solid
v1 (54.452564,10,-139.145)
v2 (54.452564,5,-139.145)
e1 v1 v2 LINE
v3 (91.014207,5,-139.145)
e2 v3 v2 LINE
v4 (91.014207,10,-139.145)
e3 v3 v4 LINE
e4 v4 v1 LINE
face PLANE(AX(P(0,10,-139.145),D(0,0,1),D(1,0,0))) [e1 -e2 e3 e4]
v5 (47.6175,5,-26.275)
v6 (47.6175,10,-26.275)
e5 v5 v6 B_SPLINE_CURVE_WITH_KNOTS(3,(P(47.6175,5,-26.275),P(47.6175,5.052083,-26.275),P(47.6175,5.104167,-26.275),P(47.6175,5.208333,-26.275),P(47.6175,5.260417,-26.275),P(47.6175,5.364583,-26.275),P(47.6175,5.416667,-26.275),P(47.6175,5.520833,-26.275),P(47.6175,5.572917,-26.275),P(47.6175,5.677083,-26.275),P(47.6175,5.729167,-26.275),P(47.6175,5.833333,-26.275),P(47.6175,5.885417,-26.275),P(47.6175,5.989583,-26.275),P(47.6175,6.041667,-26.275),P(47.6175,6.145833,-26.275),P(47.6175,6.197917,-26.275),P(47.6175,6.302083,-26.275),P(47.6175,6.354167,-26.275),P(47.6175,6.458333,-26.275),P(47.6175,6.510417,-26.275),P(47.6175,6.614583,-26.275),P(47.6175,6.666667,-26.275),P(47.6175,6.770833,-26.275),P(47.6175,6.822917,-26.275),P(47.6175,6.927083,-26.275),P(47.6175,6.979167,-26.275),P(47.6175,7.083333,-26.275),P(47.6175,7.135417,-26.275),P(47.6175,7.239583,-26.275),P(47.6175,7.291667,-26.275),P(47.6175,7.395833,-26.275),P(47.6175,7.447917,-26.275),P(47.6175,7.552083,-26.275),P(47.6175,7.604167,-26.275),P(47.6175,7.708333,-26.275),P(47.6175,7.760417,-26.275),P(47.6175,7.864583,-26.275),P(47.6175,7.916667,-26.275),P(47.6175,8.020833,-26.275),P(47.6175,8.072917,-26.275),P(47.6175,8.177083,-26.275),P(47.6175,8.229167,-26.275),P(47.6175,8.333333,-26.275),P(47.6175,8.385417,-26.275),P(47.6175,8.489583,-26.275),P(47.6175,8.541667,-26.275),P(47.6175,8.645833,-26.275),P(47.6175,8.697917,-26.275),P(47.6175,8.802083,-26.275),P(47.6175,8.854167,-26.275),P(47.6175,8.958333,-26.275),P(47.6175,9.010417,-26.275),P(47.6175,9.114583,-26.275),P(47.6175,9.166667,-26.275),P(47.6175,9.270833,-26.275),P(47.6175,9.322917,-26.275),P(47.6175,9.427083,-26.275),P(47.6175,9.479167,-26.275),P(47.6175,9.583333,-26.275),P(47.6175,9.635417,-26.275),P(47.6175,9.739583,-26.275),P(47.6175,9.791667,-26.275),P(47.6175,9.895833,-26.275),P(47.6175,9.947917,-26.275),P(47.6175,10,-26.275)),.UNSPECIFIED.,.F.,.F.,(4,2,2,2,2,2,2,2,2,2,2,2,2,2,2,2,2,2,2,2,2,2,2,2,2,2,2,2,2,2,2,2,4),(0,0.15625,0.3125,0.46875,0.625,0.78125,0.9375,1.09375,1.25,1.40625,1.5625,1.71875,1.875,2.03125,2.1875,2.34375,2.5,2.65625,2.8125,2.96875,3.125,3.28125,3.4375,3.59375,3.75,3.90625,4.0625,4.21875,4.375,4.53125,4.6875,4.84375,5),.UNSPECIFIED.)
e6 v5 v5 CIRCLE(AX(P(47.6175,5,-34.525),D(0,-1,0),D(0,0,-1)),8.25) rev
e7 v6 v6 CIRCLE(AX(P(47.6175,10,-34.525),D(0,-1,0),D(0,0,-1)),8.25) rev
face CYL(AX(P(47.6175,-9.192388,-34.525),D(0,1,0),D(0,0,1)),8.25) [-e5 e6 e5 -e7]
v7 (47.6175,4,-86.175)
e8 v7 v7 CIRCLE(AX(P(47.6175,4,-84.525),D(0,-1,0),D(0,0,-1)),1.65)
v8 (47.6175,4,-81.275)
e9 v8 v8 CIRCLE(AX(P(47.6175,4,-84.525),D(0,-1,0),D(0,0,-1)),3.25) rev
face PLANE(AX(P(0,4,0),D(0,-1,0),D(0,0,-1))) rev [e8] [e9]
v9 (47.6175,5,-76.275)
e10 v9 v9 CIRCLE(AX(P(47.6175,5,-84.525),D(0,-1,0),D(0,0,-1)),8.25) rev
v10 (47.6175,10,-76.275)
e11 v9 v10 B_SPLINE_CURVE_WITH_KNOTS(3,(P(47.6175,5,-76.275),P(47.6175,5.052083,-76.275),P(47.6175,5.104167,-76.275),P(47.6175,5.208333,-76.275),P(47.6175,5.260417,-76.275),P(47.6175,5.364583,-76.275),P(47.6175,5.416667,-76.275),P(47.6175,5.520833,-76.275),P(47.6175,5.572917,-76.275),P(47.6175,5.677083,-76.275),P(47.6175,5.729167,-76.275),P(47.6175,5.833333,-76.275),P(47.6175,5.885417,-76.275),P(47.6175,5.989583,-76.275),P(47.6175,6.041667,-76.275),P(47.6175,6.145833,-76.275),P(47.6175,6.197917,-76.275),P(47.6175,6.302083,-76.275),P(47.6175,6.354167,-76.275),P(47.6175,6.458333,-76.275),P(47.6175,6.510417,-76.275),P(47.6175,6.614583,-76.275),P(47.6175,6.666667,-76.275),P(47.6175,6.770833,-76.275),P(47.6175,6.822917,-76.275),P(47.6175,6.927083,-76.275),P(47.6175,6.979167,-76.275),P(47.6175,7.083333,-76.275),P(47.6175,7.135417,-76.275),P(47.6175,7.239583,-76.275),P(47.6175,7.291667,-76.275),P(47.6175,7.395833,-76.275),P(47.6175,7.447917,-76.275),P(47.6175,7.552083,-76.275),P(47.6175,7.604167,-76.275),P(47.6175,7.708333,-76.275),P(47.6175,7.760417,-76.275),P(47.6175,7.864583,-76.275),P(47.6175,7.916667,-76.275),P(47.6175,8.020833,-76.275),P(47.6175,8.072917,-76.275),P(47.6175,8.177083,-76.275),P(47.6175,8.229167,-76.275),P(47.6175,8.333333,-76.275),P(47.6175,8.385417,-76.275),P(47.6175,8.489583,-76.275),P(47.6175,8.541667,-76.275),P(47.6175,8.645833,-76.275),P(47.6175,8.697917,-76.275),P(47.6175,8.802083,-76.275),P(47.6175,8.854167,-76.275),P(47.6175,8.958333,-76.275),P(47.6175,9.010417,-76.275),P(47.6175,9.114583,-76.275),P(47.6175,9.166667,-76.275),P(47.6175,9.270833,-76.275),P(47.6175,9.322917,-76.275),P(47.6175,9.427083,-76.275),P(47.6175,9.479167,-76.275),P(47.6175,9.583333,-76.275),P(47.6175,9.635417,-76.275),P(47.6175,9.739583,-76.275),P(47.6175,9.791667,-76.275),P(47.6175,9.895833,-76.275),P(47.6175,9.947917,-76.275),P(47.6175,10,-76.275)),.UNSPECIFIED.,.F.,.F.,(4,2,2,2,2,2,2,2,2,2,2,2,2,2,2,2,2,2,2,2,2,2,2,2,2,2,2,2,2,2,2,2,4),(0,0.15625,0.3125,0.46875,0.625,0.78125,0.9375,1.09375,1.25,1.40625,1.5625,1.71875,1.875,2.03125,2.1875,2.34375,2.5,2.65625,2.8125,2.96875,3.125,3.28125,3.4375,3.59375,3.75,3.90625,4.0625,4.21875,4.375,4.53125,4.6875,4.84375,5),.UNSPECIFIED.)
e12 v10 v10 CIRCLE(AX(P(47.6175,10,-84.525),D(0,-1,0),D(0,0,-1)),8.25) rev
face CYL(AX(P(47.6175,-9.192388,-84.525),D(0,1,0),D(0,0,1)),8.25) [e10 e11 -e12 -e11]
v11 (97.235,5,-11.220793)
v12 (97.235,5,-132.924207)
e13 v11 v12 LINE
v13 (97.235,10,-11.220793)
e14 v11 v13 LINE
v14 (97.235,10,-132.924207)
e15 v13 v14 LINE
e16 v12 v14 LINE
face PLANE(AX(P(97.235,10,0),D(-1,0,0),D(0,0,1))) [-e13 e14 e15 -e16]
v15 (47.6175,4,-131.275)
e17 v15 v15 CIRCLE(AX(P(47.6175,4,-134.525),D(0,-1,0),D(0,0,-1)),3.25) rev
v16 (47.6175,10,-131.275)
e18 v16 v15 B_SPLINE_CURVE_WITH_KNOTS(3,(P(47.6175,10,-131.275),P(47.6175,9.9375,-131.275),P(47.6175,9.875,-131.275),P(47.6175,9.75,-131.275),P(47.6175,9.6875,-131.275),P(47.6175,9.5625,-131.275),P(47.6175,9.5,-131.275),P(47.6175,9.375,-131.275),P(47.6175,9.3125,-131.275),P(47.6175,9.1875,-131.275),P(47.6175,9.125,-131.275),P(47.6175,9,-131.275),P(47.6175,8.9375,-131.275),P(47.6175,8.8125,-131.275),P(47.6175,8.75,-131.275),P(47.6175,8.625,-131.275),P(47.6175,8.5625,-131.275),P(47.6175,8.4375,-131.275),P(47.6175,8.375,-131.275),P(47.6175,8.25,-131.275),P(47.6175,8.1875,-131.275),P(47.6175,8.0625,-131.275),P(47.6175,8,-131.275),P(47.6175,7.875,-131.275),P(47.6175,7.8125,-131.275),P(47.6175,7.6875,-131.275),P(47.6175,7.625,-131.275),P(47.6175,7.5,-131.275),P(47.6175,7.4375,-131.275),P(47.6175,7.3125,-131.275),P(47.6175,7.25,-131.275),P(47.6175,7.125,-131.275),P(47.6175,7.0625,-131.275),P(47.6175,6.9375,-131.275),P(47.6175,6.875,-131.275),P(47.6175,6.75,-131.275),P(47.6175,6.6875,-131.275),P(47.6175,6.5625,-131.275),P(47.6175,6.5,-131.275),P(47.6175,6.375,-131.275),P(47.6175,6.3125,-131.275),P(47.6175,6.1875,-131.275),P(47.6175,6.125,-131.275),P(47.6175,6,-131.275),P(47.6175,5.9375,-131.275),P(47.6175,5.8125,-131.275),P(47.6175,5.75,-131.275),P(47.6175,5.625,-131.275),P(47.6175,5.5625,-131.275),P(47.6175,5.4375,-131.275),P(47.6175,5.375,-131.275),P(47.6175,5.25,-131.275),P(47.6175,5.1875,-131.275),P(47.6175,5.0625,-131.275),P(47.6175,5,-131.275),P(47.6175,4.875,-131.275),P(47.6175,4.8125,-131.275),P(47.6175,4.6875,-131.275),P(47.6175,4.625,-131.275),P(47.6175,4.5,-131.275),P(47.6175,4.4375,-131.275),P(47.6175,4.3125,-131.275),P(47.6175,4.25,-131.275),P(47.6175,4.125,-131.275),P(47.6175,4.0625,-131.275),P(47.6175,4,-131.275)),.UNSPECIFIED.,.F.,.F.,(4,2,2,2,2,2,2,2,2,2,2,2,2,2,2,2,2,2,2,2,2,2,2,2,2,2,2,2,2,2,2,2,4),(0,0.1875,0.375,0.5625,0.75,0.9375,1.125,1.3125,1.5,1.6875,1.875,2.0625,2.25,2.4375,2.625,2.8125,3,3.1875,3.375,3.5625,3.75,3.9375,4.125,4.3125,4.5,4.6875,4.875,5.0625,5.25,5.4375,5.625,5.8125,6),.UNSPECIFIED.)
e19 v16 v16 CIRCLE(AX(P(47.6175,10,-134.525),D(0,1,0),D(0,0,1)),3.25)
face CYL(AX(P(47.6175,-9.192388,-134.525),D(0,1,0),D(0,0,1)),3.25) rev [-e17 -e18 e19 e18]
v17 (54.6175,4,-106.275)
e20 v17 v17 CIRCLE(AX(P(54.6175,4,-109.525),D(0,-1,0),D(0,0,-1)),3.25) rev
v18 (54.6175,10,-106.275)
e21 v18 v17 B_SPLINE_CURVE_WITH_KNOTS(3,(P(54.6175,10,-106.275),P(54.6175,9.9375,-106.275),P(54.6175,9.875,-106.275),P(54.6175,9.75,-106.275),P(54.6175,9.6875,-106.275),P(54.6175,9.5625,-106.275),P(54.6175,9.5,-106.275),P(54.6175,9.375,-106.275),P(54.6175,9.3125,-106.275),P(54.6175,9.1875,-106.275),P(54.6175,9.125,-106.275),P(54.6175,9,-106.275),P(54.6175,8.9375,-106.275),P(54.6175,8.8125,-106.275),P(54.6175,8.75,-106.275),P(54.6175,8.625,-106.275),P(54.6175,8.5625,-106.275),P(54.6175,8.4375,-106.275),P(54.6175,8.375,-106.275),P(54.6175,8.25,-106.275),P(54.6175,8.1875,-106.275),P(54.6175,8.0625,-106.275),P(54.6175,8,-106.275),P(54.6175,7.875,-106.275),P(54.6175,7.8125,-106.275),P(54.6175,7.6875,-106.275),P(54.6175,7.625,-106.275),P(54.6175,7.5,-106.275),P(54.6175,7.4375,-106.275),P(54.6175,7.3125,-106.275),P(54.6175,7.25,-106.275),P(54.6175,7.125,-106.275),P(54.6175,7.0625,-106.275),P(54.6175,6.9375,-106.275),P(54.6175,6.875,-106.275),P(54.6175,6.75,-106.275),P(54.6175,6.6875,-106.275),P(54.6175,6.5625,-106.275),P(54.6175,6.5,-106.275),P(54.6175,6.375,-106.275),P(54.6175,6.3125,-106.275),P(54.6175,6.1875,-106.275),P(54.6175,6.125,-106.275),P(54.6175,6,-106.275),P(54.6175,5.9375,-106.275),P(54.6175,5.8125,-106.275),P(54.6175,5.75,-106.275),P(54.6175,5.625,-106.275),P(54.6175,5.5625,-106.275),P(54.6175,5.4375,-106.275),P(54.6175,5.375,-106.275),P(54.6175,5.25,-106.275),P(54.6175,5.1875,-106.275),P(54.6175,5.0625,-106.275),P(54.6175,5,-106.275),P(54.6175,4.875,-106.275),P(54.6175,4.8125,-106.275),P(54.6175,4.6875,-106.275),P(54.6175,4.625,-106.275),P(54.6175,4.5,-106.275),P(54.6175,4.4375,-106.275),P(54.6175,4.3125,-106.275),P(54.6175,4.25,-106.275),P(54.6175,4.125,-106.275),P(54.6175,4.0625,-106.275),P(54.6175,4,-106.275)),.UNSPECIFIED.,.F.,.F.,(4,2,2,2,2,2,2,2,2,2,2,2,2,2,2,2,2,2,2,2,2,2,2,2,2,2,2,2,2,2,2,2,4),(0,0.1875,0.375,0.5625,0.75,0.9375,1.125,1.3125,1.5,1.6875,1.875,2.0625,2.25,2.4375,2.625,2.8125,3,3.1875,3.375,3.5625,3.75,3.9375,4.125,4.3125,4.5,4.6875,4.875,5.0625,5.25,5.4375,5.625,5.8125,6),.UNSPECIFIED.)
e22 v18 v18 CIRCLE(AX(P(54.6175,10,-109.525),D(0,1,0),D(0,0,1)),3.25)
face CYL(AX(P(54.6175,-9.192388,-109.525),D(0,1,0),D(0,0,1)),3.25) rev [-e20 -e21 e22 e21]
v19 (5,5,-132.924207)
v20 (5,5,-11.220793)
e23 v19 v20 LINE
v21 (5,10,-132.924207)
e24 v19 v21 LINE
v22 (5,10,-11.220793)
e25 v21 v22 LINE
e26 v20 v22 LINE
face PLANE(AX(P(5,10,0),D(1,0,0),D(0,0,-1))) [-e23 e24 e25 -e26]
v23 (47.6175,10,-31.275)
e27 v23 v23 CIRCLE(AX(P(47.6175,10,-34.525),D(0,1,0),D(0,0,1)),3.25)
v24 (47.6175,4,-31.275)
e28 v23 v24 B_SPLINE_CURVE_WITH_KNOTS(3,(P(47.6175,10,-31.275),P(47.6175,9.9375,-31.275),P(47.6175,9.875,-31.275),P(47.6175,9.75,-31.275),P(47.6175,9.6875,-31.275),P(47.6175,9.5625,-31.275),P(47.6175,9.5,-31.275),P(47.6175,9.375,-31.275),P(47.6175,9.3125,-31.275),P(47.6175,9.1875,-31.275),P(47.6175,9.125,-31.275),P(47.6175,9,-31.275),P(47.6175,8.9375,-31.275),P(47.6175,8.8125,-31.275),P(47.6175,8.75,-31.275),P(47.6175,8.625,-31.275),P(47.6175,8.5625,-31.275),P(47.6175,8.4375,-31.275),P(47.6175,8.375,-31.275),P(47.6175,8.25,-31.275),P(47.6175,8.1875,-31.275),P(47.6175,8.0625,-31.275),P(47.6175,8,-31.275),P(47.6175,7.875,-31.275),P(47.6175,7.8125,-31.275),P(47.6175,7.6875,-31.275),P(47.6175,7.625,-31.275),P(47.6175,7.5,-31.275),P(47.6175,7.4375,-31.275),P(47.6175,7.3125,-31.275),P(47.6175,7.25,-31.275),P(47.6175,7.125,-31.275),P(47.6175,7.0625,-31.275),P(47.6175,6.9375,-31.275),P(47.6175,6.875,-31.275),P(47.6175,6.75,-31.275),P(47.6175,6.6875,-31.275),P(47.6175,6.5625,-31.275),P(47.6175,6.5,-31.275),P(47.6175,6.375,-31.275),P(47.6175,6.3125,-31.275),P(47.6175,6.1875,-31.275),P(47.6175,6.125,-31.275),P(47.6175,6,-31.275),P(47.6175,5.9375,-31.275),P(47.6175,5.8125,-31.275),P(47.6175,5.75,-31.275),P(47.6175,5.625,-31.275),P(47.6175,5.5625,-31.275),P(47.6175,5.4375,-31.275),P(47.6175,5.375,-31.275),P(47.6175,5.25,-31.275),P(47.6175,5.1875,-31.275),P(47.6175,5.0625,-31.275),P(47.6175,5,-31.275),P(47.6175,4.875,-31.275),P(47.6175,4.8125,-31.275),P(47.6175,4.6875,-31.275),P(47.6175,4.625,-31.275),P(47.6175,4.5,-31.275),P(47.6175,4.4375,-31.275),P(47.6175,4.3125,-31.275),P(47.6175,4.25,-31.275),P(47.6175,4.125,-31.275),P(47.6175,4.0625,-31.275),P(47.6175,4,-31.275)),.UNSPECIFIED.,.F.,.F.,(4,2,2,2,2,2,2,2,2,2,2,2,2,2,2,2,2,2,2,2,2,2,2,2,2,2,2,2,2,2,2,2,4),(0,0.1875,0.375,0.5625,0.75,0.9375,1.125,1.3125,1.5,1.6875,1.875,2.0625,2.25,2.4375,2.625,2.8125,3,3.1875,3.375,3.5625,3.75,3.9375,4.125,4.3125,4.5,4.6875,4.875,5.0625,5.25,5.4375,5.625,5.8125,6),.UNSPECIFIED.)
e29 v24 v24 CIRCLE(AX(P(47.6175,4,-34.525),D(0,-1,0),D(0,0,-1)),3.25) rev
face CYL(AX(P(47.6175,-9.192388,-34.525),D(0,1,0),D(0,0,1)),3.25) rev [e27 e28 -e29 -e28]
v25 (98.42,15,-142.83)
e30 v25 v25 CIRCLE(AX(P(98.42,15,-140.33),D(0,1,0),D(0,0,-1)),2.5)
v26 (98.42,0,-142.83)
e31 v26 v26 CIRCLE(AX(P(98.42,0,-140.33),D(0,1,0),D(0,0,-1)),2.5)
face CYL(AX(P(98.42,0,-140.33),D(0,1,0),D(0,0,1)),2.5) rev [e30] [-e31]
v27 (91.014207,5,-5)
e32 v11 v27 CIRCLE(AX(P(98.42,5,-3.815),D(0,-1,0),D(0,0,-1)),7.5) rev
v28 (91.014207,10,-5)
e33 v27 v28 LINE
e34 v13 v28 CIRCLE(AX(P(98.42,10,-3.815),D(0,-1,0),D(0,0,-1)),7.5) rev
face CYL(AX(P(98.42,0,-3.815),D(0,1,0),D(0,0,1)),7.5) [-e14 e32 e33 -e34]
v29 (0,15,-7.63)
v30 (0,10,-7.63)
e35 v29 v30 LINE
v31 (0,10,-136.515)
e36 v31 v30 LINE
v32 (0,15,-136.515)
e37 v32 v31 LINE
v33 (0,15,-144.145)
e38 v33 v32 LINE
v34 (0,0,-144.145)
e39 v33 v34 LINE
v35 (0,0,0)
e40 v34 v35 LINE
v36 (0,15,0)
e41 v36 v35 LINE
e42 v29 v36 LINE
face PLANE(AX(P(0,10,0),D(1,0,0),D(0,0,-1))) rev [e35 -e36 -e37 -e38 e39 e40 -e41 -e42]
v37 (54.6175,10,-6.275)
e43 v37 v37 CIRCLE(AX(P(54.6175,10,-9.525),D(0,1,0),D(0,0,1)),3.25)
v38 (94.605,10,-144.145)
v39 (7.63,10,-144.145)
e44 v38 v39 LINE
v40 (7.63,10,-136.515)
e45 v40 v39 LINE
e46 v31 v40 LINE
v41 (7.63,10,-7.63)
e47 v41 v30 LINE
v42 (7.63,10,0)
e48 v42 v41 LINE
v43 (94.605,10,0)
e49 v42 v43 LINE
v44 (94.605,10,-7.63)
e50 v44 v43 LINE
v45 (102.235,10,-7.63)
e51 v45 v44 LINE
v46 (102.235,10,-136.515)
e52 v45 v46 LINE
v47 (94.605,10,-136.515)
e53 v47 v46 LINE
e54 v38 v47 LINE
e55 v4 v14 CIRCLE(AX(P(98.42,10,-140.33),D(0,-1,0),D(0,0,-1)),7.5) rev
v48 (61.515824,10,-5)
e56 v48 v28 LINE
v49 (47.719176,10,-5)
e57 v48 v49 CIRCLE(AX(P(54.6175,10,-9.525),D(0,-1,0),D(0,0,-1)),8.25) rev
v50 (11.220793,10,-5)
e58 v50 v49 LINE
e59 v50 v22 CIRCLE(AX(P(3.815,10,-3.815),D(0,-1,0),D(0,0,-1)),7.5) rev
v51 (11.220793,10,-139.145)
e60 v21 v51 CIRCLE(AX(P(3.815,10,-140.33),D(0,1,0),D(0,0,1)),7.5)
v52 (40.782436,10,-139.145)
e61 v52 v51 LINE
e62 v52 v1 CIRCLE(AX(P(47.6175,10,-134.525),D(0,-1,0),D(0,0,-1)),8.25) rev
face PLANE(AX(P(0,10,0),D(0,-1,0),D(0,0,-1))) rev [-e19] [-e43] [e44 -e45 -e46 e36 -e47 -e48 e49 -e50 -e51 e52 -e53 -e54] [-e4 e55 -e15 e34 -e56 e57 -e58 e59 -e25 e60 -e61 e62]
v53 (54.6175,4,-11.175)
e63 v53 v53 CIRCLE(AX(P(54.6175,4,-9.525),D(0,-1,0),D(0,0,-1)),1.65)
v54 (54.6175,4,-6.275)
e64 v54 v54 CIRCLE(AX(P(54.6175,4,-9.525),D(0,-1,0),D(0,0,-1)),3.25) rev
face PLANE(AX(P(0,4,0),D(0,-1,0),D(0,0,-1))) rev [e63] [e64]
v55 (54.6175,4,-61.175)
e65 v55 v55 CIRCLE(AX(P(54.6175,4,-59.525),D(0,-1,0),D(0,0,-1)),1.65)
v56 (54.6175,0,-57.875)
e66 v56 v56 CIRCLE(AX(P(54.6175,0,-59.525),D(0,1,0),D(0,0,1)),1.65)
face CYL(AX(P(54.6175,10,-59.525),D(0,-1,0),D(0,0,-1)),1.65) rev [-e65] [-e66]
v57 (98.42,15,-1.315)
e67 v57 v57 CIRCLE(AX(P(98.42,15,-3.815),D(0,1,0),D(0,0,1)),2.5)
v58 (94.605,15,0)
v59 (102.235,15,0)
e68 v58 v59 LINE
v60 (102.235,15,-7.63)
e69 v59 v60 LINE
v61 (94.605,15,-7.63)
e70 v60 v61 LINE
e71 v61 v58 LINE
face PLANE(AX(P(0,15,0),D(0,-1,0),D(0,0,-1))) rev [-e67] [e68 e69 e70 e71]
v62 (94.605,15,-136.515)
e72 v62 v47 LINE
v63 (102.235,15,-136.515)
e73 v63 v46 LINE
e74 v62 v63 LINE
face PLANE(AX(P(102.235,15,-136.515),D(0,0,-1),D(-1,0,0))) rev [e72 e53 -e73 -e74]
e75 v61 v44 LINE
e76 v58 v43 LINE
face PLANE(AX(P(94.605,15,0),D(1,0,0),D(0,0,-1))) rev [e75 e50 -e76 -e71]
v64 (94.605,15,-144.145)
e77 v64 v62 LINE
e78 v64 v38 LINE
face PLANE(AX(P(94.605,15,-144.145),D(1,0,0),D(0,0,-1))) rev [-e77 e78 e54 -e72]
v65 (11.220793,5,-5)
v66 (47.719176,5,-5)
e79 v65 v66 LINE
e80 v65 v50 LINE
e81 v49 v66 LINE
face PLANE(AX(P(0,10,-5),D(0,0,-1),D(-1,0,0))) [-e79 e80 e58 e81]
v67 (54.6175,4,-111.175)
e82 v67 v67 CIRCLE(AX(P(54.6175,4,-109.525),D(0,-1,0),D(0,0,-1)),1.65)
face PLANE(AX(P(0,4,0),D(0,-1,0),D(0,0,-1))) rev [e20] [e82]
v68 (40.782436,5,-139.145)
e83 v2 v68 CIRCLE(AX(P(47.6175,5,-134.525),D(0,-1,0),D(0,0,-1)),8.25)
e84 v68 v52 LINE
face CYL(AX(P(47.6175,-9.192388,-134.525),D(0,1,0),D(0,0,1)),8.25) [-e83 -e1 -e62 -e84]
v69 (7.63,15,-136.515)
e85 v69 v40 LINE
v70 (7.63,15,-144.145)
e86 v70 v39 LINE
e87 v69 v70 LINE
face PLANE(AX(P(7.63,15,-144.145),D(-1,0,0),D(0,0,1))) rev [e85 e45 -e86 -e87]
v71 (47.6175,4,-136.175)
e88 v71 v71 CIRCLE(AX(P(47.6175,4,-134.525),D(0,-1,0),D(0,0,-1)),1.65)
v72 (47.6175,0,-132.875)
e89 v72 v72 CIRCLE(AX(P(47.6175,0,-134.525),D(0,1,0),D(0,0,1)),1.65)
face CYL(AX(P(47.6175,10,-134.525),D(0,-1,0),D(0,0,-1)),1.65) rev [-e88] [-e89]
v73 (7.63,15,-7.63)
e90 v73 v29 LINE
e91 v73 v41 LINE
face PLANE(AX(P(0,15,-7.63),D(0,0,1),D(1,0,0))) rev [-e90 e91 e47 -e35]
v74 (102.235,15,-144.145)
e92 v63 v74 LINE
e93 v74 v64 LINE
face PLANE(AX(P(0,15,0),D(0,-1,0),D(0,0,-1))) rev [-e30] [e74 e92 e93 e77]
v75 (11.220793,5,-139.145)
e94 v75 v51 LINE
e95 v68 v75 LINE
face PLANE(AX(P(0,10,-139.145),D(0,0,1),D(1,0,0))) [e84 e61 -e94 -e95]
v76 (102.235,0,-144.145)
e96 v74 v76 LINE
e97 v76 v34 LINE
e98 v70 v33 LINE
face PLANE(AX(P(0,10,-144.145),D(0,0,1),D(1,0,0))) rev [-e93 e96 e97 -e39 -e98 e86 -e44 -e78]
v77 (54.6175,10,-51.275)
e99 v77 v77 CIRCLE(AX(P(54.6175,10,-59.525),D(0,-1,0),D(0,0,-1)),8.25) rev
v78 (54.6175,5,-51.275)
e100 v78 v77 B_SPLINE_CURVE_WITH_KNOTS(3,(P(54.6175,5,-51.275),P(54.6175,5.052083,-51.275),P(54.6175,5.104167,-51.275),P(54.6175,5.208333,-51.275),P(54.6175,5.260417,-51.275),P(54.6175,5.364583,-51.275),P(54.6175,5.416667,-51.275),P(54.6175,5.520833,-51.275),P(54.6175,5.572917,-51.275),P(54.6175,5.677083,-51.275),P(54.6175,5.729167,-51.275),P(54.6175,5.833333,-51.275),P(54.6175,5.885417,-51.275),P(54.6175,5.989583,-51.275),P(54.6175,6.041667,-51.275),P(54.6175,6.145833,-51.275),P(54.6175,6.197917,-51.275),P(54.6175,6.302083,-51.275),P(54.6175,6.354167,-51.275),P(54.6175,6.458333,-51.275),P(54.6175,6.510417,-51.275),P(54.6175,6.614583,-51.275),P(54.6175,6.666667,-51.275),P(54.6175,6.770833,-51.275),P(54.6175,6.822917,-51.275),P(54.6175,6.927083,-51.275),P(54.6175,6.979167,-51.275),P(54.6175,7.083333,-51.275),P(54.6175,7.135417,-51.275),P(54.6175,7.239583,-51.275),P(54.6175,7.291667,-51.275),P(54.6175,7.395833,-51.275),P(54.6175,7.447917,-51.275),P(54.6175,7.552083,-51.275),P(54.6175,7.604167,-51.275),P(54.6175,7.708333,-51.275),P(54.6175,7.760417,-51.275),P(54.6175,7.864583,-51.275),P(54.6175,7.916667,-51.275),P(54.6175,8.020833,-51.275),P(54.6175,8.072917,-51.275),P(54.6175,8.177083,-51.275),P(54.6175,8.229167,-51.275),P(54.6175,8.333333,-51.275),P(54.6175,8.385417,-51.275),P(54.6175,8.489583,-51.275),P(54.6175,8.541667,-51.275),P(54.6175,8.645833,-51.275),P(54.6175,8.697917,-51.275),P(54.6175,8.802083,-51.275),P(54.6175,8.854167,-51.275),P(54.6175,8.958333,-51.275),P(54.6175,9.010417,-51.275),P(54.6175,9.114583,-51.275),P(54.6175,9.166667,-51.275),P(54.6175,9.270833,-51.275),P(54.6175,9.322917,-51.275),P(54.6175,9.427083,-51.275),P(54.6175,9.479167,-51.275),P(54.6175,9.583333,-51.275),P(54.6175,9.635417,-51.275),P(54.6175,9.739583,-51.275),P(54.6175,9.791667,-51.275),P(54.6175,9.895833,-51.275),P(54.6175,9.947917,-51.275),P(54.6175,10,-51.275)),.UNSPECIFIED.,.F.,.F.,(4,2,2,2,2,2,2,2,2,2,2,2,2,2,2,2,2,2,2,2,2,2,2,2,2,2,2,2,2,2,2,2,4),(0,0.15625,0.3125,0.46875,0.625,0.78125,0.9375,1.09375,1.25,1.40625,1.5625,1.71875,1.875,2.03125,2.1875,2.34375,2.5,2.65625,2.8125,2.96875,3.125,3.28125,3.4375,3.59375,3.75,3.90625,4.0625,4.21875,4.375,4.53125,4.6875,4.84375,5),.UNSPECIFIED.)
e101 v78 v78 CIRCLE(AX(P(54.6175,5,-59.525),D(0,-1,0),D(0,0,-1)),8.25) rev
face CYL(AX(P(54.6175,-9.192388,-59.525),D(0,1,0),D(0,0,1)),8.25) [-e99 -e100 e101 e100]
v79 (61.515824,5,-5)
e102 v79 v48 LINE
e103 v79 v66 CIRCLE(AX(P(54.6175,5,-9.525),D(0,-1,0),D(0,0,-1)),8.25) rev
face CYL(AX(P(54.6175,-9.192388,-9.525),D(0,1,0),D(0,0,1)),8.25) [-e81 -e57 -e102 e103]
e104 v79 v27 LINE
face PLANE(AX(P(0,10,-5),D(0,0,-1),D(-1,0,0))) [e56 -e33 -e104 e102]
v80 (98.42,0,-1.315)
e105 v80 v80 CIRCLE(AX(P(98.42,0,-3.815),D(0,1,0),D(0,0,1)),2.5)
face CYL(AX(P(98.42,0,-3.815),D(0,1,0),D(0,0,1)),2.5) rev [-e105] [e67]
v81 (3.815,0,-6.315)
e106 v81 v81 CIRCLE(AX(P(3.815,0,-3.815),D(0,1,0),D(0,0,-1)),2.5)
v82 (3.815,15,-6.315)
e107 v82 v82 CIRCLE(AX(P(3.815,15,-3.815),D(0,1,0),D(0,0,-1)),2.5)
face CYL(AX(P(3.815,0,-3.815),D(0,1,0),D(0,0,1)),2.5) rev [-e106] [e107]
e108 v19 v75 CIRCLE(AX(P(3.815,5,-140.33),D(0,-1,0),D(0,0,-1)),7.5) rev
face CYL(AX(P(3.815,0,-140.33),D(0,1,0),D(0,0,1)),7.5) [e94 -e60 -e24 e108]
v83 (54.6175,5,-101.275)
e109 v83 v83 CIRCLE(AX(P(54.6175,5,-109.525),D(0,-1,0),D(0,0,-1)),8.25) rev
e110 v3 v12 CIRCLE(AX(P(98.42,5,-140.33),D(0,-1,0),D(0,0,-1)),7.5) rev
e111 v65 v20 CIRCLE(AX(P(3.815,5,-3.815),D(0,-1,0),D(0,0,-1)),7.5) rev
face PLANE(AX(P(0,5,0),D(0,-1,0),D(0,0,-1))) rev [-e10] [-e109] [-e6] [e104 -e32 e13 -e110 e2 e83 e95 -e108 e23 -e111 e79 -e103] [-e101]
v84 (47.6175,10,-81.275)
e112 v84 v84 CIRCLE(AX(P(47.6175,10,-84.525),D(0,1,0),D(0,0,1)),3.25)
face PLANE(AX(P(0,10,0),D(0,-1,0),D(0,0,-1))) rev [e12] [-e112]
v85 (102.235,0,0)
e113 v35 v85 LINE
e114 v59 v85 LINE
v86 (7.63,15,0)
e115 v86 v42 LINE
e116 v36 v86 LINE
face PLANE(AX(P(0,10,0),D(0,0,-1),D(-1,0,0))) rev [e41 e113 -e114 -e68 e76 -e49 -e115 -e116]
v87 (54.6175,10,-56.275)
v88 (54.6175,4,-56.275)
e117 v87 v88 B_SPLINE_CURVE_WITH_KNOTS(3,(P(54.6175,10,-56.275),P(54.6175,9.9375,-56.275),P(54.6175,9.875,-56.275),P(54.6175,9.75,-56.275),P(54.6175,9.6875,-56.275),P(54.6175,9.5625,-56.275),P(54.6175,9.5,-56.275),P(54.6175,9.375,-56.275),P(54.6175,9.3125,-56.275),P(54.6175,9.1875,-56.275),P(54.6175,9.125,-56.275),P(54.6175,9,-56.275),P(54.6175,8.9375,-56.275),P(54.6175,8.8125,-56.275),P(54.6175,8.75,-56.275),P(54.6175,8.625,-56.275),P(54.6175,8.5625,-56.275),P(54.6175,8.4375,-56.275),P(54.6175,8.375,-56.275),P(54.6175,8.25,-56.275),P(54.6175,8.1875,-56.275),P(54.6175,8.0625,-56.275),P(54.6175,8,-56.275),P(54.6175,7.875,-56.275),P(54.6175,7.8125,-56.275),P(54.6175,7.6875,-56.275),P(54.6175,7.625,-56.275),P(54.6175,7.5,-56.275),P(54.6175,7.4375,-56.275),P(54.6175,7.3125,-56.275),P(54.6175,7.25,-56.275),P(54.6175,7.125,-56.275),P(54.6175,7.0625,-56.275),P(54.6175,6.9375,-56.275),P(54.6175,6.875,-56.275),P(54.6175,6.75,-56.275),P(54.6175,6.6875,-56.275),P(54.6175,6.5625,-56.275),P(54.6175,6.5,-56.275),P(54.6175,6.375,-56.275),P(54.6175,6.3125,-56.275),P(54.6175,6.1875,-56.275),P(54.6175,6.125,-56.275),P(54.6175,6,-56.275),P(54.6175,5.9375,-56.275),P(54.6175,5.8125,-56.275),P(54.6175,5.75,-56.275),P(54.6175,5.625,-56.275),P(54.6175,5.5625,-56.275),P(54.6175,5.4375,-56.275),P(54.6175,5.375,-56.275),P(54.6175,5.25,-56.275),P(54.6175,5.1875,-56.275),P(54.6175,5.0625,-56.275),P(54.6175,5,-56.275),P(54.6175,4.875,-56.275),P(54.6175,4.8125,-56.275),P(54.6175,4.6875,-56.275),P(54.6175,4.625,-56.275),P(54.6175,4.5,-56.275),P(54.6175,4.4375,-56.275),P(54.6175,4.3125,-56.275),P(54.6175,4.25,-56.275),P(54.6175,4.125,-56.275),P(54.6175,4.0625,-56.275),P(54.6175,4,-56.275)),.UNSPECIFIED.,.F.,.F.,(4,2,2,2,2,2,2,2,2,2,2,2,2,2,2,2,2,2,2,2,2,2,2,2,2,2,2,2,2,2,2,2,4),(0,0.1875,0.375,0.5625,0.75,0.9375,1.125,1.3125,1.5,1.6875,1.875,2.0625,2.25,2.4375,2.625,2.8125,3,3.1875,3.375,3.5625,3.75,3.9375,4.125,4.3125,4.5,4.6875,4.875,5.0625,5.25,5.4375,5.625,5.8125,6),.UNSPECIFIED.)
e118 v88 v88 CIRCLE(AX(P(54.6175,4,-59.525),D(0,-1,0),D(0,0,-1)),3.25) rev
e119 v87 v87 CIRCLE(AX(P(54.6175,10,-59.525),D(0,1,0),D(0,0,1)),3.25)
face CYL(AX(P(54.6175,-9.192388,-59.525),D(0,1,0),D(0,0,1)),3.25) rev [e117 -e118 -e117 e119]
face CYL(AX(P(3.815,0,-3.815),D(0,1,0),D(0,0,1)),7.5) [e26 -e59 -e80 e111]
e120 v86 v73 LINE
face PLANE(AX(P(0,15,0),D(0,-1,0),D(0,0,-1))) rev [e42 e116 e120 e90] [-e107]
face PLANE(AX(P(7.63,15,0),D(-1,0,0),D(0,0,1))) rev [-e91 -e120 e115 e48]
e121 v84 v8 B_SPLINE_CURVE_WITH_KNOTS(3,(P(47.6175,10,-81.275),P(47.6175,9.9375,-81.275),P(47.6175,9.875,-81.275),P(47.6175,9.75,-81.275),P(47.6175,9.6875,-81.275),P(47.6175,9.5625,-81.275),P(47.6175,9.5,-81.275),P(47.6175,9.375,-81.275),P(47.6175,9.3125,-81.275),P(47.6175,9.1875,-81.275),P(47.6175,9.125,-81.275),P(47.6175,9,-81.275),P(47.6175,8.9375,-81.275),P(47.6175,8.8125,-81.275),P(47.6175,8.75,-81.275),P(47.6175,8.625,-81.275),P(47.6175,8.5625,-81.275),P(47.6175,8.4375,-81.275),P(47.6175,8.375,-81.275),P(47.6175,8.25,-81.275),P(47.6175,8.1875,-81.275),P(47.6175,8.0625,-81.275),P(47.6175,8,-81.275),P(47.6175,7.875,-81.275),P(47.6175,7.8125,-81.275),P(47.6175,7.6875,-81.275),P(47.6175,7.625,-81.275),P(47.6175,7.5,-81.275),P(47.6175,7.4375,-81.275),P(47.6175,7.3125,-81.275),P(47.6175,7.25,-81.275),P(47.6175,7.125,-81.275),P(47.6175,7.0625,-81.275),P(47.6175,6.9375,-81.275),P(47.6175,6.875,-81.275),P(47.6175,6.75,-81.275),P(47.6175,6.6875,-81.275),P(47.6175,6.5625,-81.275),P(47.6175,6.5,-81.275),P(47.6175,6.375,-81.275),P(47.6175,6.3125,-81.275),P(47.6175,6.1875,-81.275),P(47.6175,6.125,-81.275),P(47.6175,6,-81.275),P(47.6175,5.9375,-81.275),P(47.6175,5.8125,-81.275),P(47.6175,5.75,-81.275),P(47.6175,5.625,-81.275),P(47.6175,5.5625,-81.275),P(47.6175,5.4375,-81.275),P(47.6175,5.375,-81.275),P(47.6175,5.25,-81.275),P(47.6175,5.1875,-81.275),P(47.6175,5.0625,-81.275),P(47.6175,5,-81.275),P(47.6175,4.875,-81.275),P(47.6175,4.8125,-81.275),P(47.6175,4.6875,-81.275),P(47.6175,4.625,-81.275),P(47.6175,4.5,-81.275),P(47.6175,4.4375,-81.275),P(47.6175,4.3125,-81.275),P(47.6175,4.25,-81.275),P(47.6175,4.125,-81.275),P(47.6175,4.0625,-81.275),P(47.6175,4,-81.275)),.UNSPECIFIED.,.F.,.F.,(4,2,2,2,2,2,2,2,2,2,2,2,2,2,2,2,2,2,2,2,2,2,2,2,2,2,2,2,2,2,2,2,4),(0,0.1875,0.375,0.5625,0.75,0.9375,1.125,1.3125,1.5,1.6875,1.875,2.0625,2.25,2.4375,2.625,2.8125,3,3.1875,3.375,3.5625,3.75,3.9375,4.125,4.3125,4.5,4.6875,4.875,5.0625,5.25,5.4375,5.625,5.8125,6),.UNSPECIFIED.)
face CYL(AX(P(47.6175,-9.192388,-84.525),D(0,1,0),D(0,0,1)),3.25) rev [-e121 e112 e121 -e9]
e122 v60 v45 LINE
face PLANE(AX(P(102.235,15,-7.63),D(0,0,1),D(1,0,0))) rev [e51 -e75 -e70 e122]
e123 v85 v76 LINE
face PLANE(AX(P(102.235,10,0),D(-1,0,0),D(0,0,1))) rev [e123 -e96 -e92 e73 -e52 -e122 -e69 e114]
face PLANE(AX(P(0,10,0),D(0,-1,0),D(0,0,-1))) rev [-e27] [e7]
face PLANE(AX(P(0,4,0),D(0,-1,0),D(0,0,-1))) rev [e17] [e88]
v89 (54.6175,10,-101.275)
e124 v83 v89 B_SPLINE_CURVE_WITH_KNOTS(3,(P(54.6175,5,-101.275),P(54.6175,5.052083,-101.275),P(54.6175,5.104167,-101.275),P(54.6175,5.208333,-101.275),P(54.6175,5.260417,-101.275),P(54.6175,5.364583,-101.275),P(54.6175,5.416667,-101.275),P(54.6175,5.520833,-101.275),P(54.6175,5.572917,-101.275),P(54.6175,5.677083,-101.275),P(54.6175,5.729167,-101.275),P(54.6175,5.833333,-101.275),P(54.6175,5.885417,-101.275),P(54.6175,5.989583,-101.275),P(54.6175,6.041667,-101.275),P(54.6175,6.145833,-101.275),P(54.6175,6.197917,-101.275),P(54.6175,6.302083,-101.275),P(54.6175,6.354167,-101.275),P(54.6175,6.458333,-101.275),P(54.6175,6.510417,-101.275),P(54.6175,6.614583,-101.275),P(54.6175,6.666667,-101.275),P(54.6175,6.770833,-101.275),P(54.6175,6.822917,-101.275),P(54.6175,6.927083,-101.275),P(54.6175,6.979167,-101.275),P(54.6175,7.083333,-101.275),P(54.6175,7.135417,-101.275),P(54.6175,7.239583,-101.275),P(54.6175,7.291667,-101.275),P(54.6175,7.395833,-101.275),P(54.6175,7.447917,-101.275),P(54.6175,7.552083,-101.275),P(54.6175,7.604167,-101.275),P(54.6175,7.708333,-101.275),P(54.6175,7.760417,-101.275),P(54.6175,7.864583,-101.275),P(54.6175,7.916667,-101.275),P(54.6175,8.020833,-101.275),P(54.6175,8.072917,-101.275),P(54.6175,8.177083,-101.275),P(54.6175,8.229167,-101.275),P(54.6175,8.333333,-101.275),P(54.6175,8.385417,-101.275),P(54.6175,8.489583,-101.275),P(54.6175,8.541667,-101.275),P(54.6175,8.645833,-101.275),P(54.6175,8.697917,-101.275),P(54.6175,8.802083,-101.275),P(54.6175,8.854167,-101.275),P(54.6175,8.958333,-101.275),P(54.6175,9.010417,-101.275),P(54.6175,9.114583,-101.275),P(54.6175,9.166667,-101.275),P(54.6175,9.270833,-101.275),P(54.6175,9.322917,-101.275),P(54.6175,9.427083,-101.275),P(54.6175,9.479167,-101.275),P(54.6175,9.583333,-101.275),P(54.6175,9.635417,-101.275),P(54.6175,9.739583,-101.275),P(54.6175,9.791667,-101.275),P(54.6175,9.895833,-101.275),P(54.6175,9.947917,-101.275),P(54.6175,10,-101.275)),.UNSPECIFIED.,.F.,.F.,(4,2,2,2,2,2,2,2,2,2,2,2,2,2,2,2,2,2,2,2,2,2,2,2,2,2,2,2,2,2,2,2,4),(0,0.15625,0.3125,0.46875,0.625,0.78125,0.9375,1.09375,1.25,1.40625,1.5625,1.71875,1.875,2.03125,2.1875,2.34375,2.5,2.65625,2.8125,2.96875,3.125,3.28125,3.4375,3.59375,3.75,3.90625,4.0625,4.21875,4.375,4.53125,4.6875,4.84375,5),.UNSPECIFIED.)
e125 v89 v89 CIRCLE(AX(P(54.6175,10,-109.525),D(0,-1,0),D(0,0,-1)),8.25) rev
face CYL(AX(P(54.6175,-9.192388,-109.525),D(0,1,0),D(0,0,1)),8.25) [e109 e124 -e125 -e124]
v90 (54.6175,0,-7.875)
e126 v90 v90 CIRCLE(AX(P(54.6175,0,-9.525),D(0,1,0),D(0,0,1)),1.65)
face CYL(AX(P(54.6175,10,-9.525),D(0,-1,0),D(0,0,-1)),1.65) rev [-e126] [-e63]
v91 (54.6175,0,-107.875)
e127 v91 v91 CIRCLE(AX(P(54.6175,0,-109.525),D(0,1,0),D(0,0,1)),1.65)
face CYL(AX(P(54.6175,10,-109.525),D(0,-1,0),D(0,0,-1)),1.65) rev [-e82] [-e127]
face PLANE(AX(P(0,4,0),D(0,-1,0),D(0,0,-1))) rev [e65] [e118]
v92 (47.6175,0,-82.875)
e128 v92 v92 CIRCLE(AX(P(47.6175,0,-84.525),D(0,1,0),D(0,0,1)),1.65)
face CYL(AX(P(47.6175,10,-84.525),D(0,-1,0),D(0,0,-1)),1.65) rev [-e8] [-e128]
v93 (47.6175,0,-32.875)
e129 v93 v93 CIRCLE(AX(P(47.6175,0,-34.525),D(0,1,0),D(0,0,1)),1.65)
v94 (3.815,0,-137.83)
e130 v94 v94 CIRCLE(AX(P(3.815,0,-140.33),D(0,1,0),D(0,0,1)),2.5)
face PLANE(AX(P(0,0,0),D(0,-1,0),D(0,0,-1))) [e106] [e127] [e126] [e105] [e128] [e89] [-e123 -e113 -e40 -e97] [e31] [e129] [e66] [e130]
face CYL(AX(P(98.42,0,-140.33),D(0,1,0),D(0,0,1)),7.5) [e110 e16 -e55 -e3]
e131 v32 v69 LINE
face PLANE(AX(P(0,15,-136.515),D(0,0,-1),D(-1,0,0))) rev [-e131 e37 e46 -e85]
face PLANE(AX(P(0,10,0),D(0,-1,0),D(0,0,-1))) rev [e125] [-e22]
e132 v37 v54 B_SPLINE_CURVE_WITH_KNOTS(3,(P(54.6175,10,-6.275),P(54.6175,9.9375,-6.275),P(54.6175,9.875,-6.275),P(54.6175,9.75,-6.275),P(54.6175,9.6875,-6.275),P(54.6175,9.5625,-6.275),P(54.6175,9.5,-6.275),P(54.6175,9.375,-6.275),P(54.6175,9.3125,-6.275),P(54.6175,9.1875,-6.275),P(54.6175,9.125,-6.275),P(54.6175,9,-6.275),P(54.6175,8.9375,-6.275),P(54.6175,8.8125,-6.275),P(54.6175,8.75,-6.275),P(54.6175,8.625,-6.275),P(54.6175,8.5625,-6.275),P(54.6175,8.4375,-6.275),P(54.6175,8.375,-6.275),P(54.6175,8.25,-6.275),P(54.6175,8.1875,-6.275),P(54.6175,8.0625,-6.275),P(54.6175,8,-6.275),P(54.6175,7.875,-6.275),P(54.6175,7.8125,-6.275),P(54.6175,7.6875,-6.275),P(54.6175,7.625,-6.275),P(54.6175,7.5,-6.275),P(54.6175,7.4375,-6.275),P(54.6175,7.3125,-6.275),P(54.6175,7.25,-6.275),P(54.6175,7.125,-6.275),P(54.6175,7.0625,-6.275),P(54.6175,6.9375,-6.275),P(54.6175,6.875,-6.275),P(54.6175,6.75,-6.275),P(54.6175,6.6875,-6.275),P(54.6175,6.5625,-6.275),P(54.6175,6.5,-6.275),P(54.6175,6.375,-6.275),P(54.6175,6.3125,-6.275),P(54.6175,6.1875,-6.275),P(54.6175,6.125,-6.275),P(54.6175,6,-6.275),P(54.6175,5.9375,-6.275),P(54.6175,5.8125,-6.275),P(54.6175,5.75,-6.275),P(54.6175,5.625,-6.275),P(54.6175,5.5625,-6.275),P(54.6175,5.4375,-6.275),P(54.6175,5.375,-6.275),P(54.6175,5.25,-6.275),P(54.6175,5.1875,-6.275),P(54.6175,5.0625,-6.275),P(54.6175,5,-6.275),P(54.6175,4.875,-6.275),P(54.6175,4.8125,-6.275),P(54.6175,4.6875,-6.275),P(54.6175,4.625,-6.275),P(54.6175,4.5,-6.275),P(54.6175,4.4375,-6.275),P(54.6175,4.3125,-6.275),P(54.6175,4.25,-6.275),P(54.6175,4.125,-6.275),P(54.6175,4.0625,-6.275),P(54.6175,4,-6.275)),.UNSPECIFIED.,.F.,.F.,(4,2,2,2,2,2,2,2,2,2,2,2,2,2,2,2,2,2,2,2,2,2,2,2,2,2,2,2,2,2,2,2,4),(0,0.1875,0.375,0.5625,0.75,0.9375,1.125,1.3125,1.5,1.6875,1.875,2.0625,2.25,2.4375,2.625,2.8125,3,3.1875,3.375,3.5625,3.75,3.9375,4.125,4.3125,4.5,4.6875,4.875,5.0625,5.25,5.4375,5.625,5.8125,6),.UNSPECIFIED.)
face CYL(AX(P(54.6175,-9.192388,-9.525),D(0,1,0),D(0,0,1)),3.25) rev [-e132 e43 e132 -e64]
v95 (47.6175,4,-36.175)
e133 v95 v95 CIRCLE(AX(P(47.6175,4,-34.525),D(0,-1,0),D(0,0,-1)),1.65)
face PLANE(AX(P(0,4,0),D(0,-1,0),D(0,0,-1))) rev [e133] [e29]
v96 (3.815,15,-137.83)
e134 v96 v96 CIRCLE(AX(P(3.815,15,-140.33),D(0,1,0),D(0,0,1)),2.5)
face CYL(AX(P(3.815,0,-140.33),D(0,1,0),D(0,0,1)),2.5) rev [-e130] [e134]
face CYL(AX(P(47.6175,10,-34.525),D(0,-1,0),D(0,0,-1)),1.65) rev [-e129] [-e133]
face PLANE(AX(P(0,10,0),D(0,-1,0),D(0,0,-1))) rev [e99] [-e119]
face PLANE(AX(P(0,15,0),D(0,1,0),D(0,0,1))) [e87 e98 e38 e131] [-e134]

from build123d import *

# Parameters (mm, degrees)
SKETCH1_W           = 102.235
SKETCH1_H           = 144.145
SKETCH1_R           = 1.65
BOSS_EXTRUDE1_DEPTH = 10
SKETCH2_R           = 3.25
CUT_EXTRUDE1_DEPTH  = 6
SKETCH4_R           = 2.5
CUT_EXTRUDE2_DEPTH  = 178.002192783
BOSS_EXTRUDE2_START = 5
SKETCH5_W           = 7.63
SKETCH5_H           = 7.63
SKETCH5_R           = 2.5
BOSS_EXTRUDE2_DEPTH = 5
SHELL4_START        = 5
SHELL4_OUTLINE_R    = 8.25
SHELL4_DEPTH        = 5


# Read off the part's stored shape, not the designer's step: Shell4
with BuildPart() as part:
    # Sketch1 → Boss-Extrude1 (new body)
    with BuildSketch(Plane(origin=(0, 0, 0), x_dir=(1, 0, 0), z_dir=(0, 1, 0))):
        with Locations((51.1175, 72.0725)):
            Rectangle(SKETCH1_W, SKETCH1_H)
        with Locations(Location((47.6175, 134.525, 0), (0, 0, 270))):
            Circle(SKETCH1_R, mode=Mode.SUBTRACT)
        with Locations(Location((54.6175, 109.525, 0), (0, 0, 270))):
            Circle(SKETCH1_R, mode=Mode.SUBTRACT)
        with Locations(Location((54.6175, 59.525, 0), (0, 0, 270))):
            Circle(SKETCH1_R, mode=Mode.SUBTRACT)
        with Locations(Location((47.6175, 84.525, 0), (0, 0, 270))):
            Circle(SKETCH1_R, mode=Mode.SUBTRACT)
        with Locations(Location((54.6175, 9.525, 0), (0, 0, 270))):
            Circle(SKETCH1_R, mode=Mode.SUBTRACT)
        with Locations(Location((47.6175, 34.525, 0), (0, 0, 270))):
            Circle(SKETCH1_R, mode=Mode.SUBTRACT)
    extrude(amount=BOSS_EXTRUDE1_DEPTH)

    # Sketch2 → Cut-Extrude1 (cut)
    with BuildSketch(Plane(origin=(0, 10, 0), x_dir=(1, 0, 0), z_dir=(0, 1, 0))):
        with Locations(Location((47.6175, 134.525, 0), (0, 0, 270))):
            Circle(SKETCH2_R)
        with Locations(Location((54.6175, 109.525, 0), (0, 0, 270))):
            Circle(SKETCH2_R)
        with Locations(Location((47.6175, 84.525, 0), (0, 0, 270))):
            Circle(SKETCH2_R)
        with Locations(Location((54.6175, 59.525, 0), (0, 0, 270))):
            Circle(SKETCH2_R)
        with Locations(Location((47.6175, 34.525, 0), (0, 0, 270))):
            Circle(SKETCH2_R)
        with Locations(Location((54.6175, 9.525, 0), (0, 0, 270))):
            Circle(SKETCH2_R)
    extrude(amount=-CUT_EXTRUDE1_DEPTH, mode=Mode.SUBTRACT)

    # Sketch4 → Cut-Extrude2 (cut, through all)
    with BuildSketch(Plane(origin=(0, 10, 0), x_dir=(1, 0, 0), z_dir=(0, 1, 0))):
        with Locations(Location((3.815, 140.33, 0), (0, 0, 270))):
            Circle(SKETCH4_R)
        with Locations(Location((98.42, 140.33, 0), (0, 0, 90))):
            Circle(SKETCH4_R)
        with Locations(Location((98.42, 3.815, 0), (0, 0, 270))):
            Circle(SKETCH4_R)
        with Locations(Location((3.815, 3.815, 0), (0, 0, 90))):
            Circle(SKETCH4_R)
    extrude(amount=-CUT_EXTRUDE2_DEPTH, mode=Mode.SUBTRACT)

    # Sketch5 → Boss-Extrude2 (add)
    # profile 1 of 4: a face of its own
    with BuildSketch(Plane(origin=(0, 10, 0), x_dir=(1, 0, 0), z_dir=(0, 1, 0)).offset(BOSS_EXTRUDE2_START)):
        with Locations((3.815, 140.33)):
            Rectangle(SKETCH5_W, SKETCH5_H)
        with Locations(Location((3.815, 140.33, 0), (0, 0, 270))):
            Circle(SKETCH5_R, mode=Mode.SUBTRACT)
    # profile 2 of 4: a face of its own
    with BuildSketch(Plane(origin=(0, 10, 0), x_dir=(1, 0, 0), z_dir=(0, 1, 0)).offset(BOSS_EXTRUDE2_START)):
        with Locations((98.42, 140.33)):
            Rectangle(SKETCH5_W, SKETCH5_H)
        with Locations(Location((98.42, 140.33, 0), (0, 0, 90))):
            Circle(SKETCH5_R, mode=Mode.SUBTRACT)
    # profile 3 of 4: a face of its own
    with BuildSketch(Plane(origin=(0, 10, 0), x_dir=(1, 0, 0), z_dir=(0, 1, 0)).offset(BOSS_EXTRUDE2_START)):
        with Locations((98.42, 3.815)):
            Rectangle(SKETCH5_W, SKETCH5_H)
        with Locations(Location((98.42, 3.815, 0), (0, 0, 270))):
            Circle(SKETCH5_R, mode=Mode.SUBTRACT)
    # profile 4 of 4: a face of its own
    with BuildSketch(Plane(origin=(0, 10, 0), x_dir=(1, 0, 0), z_dir=(0, 1, 0)).offset(BOSS_EXTRUDE2_START)):
        with Locations((3.815, 3.815)):
            Rectangle(SKETCH5_W, SKETCH5_H)
        with Locations(Location((3.815, 3.815, 0), (0, 0, 90))):
            Circle(SKETCH5_R, mode=Mode.SUBTRACT)
    extrude(amount=-BOSS_EXTRUDE2_DEPTH)

    # Shell4 outline → Shell4 (cut)
    with BuildSketch(Plane(origin=(0, 0, 0), x_dir=(1, 0, 0), z_dir=(0, 1, 0)).offset(SHELL4_START)):
        with BuildLine():
            ThreePointArc((47.719175928, 5), (54.6175, 17.775), (61.515824072, 5))
            Line((61.515824072, 5), (91.01420666, 5))
            ThreePointArc((91.01420666, 5), (93.116699141, 9.118300859), (97.235, 11.22079334))
            Line((97.235, 11.22079334), (97.235, 132.92420666))
            ThreePointArc((97.235, 132.92420666), (93.116699141, 135.026699141), (91.01420666, 139.145))
            Line((91.01420666, 139.145), (54.452564008, 139.145))
            ThreePointArc((54.452564008, 139.145), (47.6175, 126.275), (40.782435992, 139.145))
            Line((40.782435992, 139.145), (11.22079334, 139.145))
            ThreePointArc((11.22079334, 139.145), (9.118300859, 135.026699141), (5, 132.92420666))
            Line((5, 132.92420666), (5, 11.22079334))
            ThreePointArc((5, 11.22079334), (9.118300859, 9.118300859), (11.22079334, 5))
            Line((11.22079334, 5), (47.719175928, 5))
        make_face()
        with Locations((47.6175, 34.525)):
            Circle(SHELL4_OUTLINE_R, mode=Mode.SUBTRACT)
        with Locations((54.6175, 59.525)):
            Circle(SHELL4_OUTLINE_R, mode=Mode.SUBTRACT)
        with Locations((47.6175, 84.525)):
            Circle(SHELL4_OUTLINE_R, mode=Mode.SUBTRACT)
        with Locations((54.6175, 109.525)):
            Circle(SHELL4_OUTLINE_R, mode=Mode.SUBTRACT)
    extrude(amount=SHELL4_DEPTH, mode=Mode.SUBTRACT)


solid = part.part
